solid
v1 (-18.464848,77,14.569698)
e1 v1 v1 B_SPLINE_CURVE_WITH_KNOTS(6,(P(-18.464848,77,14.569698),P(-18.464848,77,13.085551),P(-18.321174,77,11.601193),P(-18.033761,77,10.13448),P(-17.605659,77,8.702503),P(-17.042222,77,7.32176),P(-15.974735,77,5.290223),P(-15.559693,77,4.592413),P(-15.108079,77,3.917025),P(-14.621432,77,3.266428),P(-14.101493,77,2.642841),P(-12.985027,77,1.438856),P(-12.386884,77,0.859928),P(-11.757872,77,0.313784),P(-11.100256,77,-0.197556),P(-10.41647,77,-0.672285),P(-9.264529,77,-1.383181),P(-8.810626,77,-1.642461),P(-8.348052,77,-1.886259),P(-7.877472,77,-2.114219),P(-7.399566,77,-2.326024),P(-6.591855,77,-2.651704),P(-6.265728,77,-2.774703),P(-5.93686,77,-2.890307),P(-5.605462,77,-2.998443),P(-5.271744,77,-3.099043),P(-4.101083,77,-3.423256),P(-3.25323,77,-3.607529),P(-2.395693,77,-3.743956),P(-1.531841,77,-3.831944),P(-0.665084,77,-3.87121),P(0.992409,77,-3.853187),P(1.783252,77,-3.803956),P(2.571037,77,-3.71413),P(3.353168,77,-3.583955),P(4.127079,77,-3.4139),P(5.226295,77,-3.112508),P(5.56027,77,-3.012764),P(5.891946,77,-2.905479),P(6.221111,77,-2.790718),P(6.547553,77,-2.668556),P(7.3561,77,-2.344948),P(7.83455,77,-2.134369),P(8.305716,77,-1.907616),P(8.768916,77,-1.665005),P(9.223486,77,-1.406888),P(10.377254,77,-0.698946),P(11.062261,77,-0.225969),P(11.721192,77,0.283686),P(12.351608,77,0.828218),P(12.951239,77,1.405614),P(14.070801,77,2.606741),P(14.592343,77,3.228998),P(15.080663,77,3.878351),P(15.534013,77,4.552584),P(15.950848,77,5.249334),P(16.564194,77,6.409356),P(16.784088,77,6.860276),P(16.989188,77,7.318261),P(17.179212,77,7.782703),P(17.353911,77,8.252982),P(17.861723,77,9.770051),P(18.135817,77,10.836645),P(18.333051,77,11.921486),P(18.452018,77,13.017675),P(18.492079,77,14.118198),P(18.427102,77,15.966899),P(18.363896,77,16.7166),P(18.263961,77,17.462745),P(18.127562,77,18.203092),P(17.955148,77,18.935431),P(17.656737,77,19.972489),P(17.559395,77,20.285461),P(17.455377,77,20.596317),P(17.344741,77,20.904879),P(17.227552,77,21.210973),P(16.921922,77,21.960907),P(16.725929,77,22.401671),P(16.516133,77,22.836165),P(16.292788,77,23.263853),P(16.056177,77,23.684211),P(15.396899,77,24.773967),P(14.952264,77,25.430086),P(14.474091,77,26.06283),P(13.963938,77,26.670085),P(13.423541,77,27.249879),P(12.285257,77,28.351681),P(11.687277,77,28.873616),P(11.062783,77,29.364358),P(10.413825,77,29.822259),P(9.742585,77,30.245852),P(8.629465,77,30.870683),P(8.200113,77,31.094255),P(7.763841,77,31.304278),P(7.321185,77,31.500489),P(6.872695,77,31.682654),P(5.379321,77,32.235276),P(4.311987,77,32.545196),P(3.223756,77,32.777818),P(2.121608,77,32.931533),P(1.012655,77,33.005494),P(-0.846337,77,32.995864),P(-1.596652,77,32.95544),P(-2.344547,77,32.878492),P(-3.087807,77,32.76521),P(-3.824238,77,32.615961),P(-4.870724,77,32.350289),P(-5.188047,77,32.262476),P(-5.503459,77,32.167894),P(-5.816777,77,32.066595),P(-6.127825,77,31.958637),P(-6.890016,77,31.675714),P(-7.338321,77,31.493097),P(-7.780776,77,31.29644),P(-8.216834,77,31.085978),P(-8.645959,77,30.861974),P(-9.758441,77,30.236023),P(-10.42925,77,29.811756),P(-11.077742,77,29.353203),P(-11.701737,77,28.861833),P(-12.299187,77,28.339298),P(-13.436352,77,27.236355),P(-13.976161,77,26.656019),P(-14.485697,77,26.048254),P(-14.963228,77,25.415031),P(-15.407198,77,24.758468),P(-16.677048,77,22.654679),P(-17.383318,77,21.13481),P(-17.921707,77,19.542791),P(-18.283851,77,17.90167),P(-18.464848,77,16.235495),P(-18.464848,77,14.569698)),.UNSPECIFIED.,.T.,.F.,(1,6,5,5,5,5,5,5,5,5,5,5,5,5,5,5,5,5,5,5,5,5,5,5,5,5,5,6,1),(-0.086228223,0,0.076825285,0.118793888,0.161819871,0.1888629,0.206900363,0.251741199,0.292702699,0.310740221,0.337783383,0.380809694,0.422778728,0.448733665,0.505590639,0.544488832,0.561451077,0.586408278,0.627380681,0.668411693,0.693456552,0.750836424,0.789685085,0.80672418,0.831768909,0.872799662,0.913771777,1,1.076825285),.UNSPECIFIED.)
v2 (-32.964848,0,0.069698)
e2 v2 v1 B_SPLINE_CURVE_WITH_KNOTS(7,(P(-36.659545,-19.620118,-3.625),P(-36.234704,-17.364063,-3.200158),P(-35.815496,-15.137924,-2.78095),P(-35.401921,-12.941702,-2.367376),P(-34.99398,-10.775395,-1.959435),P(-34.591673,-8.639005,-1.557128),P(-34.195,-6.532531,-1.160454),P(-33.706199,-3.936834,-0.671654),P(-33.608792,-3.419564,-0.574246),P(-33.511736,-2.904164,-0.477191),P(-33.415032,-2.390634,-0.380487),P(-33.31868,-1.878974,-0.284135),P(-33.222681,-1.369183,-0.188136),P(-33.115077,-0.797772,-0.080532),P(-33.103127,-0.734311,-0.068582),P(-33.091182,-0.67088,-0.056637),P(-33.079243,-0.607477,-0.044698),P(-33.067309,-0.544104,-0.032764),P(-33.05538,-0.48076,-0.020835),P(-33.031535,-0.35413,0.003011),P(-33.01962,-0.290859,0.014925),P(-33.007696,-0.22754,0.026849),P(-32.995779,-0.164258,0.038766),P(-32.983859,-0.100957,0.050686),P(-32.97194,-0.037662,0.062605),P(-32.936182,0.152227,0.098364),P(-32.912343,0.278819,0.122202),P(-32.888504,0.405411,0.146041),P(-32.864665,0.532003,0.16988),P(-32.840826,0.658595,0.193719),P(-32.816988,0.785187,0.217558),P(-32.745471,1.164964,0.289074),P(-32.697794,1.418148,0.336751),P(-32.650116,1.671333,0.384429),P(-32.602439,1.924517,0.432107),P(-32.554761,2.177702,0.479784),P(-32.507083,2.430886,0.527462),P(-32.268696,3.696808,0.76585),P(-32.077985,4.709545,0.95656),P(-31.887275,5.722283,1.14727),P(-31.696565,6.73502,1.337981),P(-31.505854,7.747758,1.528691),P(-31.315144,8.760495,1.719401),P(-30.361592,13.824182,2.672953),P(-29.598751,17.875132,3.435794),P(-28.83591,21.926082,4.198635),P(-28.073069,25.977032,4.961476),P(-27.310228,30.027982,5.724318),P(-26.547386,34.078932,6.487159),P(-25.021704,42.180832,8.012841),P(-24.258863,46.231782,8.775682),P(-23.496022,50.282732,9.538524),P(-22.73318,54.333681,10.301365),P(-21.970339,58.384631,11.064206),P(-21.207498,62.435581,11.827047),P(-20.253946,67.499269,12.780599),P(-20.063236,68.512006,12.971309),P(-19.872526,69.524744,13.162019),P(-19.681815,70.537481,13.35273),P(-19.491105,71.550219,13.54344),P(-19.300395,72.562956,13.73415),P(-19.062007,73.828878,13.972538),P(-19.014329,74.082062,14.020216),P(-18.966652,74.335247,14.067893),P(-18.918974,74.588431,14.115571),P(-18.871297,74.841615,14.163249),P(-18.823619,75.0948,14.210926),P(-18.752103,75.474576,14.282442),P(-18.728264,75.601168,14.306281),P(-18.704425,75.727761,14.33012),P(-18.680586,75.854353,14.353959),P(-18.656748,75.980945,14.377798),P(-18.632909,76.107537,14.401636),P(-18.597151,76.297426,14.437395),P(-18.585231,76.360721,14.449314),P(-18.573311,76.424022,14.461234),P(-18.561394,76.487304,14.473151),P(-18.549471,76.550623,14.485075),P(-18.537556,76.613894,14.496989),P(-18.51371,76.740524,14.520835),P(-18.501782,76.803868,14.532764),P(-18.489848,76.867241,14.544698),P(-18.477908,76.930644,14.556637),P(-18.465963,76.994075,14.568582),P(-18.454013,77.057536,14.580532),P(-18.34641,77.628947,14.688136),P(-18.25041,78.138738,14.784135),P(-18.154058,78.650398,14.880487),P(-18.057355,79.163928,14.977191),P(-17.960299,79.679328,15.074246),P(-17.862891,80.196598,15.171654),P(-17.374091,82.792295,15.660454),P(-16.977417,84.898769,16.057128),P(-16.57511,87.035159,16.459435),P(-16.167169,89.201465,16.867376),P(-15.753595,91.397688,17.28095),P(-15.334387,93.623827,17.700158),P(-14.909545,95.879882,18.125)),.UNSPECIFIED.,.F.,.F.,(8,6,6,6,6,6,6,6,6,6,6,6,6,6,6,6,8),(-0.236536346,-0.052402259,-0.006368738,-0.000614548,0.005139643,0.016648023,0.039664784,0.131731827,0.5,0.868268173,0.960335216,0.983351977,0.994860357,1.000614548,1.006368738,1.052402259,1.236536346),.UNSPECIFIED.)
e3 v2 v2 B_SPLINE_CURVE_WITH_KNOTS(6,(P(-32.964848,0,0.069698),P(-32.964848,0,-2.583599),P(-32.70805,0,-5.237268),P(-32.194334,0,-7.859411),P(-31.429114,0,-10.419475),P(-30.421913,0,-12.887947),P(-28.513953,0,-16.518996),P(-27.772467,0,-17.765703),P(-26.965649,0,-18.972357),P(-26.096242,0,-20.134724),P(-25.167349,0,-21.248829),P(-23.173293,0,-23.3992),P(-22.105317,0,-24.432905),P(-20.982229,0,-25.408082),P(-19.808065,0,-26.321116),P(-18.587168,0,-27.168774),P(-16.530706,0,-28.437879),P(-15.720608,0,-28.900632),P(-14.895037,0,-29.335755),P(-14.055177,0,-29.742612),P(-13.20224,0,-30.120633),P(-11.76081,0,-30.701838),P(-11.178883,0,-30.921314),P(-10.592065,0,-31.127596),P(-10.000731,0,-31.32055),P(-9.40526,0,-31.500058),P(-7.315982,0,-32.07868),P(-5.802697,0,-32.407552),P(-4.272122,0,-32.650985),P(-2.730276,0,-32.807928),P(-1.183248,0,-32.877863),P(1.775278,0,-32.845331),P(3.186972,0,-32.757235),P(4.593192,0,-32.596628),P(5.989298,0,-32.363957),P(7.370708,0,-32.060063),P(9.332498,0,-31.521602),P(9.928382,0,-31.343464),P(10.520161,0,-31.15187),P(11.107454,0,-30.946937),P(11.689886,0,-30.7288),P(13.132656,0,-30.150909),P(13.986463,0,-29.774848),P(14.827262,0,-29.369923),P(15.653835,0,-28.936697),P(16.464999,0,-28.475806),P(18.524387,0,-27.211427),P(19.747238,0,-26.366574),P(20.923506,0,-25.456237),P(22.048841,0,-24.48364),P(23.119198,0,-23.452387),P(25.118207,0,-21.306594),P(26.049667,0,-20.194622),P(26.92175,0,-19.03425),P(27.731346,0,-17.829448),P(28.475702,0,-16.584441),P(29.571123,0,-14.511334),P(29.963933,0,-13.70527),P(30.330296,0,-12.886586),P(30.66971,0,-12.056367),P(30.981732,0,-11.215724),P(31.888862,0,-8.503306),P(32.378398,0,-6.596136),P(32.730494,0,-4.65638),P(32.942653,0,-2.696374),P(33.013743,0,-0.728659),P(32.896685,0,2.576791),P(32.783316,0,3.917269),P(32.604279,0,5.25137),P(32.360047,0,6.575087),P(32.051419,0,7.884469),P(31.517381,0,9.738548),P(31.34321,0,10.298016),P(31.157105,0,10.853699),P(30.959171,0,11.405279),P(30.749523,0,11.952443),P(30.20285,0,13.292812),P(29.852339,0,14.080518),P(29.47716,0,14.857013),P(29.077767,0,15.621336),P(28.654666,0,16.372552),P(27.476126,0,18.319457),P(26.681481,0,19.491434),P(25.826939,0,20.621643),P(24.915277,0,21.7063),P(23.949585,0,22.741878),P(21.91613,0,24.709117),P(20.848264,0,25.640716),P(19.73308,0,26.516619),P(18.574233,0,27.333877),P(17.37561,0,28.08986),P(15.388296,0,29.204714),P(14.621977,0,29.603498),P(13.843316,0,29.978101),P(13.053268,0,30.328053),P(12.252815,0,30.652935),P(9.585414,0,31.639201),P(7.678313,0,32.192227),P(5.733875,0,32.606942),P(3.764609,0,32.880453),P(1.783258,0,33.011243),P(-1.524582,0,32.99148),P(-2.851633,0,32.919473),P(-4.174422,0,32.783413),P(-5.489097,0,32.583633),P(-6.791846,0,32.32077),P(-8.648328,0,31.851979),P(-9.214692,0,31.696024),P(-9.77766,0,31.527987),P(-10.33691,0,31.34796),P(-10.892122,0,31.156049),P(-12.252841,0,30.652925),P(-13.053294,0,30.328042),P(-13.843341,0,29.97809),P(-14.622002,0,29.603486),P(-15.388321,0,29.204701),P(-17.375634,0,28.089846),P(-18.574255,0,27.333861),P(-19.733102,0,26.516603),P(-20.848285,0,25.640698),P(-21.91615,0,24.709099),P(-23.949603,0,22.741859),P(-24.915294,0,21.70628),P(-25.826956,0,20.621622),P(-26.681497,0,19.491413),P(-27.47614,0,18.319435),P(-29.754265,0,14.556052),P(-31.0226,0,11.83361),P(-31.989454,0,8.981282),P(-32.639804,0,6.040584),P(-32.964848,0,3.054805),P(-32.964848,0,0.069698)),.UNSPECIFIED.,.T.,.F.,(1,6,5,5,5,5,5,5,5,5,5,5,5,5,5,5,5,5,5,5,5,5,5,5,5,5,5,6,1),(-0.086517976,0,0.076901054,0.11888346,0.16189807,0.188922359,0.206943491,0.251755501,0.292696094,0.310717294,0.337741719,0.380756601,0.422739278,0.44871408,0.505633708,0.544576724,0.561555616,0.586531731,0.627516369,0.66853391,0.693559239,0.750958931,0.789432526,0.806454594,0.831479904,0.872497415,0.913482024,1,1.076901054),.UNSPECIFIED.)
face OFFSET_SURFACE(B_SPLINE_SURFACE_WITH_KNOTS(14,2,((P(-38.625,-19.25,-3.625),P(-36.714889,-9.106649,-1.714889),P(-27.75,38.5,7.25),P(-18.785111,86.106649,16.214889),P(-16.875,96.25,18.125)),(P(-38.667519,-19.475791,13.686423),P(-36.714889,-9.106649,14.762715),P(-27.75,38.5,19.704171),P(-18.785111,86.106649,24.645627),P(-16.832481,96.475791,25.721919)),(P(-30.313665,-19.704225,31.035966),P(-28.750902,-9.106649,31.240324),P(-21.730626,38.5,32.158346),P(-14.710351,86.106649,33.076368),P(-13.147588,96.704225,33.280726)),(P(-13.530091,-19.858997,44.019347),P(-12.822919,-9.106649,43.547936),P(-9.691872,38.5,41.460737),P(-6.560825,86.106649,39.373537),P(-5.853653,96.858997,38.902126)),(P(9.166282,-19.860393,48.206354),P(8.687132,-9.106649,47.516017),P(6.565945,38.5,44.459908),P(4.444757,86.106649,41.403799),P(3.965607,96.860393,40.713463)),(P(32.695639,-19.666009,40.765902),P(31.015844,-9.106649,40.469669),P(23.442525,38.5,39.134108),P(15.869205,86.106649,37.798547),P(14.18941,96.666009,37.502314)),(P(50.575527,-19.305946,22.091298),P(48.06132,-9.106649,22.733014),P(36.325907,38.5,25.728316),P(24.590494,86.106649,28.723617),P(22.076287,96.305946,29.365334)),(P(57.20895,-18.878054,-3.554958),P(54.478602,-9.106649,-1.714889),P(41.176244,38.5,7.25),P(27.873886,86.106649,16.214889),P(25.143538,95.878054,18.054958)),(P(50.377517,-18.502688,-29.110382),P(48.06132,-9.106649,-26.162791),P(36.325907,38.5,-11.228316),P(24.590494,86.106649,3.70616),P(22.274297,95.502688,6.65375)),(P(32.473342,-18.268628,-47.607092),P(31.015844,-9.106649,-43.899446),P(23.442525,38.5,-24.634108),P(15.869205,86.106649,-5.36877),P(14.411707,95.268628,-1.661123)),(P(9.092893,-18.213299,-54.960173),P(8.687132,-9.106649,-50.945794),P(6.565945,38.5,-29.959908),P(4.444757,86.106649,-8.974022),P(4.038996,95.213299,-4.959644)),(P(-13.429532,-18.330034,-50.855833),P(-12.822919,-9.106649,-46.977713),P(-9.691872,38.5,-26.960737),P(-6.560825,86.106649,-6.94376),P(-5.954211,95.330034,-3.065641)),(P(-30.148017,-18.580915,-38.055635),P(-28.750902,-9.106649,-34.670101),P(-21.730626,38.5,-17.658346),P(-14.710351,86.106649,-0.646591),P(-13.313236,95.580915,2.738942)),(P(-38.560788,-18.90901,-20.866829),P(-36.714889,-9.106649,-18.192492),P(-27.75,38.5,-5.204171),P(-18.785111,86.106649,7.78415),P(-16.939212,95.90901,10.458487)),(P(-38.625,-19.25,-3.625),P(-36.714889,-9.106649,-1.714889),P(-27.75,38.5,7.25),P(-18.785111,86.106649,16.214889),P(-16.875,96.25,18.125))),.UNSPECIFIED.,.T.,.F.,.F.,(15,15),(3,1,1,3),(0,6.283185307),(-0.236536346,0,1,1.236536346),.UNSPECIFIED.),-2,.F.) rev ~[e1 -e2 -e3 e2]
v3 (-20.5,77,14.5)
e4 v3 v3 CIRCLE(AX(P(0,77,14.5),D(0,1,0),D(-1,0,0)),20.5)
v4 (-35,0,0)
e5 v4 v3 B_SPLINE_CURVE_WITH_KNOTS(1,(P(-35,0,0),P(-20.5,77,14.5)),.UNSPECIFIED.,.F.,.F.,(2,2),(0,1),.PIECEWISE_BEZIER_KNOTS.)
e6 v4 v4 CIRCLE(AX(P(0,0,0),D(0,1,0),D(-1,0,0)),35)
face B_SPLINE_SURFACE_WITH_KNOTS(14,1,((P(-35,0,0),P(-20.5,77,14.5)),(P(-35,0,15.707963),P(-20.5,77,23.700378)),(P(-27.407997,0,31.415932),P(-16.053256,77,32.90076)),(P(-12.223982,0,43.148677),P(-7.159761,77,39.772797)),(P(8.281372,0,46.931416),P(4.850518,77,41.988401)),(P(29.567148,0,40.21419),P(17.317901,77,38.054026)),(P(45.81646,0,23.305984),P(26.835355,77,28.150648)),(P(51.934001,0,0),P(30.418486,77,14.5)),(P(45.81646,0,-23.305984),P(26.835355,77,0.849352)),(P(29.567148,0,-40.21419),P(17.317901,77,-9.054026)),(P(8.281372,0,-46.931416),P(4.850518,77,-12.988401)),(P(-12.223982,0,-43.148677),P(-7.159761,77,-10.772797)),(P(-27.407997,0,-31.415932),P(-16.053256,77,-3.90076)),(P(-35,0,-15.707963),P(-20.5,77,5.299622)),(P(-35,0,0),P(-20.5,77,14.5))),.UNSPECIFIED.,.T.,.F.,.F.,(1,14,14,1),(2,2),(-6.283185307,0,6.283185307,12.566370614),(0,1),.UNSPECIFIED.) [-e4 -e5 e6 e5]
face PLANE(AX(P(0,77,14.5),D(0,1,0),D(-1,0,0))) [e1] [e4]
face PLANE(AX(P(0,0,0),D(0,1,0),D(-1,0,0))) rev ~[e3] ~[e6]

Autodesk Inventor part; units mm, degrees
ref_plane "YZ Plane" through (0, 0, 0) normal (1, 0, 0) x (0, 1, 0)
ref_plane "XY Plane" through (0, 0, 0) normal (0, 0, 1) x (1, 0, 0)
sketch "Szkic6" plane through (0, 0, 0) normal (0, 1, 0) x (-1, 0, 0)
  circle A0 centre (0, 0) radius 35
  dimension "d33" = 70
ref_plane "Płaszczyzna konstrukcyjna1" through (0, 77, 0) normal (0, 1, 0) x (-1, 0, 0)
sketch "Szkic7" plane through (0, 77, 0) normal (0, 1, 0) x (-1, 0, 0)
  circle A0 centre (0, 14.5) radius 20.5
  line L0 (0, -20.3) -> (0, 20.3) construction
  circle A1 centre (0, 0) radius 35 construction
  dimension "d35" = 41
loft "Wyciągnięcie złożone1" add profiles "Szkic6", "Szkic7"
shell "Skorupa1" thickness 2 removed faces 2 at (4.592, 77, 16.9101) at (1.9985, 0, 11.019)
equation "\"d33\" = OD1"
equation "\"d35\" = OD2"
equation "\"d52\" = THK"
equation "\"SzerokośćGięciaPodcięcia\" = Grubość"
equation "\"RozmiarPodcięciaNarożnika\" = 4 * Grubość"
equation "\"PromieńPrzejścia\" = PromieńGięcia"
equation "\"Rozmiar_promienia_Jacobiego\" = PromieńGięcia"
equation "\"Wielk_odstępu\" = Grubość"
equation "\"d2\" = PromieńGięcia"
equation "\"d23\" = PromieńGięcia"
equation "\"OD1\" = 70"
equation "\"OD2\" = 41"
equation "\"L\" = 77"
equation "\"THK\" = 2"
equation "\"d34\" = L"
equation "\"Grubość\" = 1.5"
equation "\"PromieńGięcia\" = 3"
properties part number "Redukcja asymetryczna Ø70x41x2 L=77" material "304"
